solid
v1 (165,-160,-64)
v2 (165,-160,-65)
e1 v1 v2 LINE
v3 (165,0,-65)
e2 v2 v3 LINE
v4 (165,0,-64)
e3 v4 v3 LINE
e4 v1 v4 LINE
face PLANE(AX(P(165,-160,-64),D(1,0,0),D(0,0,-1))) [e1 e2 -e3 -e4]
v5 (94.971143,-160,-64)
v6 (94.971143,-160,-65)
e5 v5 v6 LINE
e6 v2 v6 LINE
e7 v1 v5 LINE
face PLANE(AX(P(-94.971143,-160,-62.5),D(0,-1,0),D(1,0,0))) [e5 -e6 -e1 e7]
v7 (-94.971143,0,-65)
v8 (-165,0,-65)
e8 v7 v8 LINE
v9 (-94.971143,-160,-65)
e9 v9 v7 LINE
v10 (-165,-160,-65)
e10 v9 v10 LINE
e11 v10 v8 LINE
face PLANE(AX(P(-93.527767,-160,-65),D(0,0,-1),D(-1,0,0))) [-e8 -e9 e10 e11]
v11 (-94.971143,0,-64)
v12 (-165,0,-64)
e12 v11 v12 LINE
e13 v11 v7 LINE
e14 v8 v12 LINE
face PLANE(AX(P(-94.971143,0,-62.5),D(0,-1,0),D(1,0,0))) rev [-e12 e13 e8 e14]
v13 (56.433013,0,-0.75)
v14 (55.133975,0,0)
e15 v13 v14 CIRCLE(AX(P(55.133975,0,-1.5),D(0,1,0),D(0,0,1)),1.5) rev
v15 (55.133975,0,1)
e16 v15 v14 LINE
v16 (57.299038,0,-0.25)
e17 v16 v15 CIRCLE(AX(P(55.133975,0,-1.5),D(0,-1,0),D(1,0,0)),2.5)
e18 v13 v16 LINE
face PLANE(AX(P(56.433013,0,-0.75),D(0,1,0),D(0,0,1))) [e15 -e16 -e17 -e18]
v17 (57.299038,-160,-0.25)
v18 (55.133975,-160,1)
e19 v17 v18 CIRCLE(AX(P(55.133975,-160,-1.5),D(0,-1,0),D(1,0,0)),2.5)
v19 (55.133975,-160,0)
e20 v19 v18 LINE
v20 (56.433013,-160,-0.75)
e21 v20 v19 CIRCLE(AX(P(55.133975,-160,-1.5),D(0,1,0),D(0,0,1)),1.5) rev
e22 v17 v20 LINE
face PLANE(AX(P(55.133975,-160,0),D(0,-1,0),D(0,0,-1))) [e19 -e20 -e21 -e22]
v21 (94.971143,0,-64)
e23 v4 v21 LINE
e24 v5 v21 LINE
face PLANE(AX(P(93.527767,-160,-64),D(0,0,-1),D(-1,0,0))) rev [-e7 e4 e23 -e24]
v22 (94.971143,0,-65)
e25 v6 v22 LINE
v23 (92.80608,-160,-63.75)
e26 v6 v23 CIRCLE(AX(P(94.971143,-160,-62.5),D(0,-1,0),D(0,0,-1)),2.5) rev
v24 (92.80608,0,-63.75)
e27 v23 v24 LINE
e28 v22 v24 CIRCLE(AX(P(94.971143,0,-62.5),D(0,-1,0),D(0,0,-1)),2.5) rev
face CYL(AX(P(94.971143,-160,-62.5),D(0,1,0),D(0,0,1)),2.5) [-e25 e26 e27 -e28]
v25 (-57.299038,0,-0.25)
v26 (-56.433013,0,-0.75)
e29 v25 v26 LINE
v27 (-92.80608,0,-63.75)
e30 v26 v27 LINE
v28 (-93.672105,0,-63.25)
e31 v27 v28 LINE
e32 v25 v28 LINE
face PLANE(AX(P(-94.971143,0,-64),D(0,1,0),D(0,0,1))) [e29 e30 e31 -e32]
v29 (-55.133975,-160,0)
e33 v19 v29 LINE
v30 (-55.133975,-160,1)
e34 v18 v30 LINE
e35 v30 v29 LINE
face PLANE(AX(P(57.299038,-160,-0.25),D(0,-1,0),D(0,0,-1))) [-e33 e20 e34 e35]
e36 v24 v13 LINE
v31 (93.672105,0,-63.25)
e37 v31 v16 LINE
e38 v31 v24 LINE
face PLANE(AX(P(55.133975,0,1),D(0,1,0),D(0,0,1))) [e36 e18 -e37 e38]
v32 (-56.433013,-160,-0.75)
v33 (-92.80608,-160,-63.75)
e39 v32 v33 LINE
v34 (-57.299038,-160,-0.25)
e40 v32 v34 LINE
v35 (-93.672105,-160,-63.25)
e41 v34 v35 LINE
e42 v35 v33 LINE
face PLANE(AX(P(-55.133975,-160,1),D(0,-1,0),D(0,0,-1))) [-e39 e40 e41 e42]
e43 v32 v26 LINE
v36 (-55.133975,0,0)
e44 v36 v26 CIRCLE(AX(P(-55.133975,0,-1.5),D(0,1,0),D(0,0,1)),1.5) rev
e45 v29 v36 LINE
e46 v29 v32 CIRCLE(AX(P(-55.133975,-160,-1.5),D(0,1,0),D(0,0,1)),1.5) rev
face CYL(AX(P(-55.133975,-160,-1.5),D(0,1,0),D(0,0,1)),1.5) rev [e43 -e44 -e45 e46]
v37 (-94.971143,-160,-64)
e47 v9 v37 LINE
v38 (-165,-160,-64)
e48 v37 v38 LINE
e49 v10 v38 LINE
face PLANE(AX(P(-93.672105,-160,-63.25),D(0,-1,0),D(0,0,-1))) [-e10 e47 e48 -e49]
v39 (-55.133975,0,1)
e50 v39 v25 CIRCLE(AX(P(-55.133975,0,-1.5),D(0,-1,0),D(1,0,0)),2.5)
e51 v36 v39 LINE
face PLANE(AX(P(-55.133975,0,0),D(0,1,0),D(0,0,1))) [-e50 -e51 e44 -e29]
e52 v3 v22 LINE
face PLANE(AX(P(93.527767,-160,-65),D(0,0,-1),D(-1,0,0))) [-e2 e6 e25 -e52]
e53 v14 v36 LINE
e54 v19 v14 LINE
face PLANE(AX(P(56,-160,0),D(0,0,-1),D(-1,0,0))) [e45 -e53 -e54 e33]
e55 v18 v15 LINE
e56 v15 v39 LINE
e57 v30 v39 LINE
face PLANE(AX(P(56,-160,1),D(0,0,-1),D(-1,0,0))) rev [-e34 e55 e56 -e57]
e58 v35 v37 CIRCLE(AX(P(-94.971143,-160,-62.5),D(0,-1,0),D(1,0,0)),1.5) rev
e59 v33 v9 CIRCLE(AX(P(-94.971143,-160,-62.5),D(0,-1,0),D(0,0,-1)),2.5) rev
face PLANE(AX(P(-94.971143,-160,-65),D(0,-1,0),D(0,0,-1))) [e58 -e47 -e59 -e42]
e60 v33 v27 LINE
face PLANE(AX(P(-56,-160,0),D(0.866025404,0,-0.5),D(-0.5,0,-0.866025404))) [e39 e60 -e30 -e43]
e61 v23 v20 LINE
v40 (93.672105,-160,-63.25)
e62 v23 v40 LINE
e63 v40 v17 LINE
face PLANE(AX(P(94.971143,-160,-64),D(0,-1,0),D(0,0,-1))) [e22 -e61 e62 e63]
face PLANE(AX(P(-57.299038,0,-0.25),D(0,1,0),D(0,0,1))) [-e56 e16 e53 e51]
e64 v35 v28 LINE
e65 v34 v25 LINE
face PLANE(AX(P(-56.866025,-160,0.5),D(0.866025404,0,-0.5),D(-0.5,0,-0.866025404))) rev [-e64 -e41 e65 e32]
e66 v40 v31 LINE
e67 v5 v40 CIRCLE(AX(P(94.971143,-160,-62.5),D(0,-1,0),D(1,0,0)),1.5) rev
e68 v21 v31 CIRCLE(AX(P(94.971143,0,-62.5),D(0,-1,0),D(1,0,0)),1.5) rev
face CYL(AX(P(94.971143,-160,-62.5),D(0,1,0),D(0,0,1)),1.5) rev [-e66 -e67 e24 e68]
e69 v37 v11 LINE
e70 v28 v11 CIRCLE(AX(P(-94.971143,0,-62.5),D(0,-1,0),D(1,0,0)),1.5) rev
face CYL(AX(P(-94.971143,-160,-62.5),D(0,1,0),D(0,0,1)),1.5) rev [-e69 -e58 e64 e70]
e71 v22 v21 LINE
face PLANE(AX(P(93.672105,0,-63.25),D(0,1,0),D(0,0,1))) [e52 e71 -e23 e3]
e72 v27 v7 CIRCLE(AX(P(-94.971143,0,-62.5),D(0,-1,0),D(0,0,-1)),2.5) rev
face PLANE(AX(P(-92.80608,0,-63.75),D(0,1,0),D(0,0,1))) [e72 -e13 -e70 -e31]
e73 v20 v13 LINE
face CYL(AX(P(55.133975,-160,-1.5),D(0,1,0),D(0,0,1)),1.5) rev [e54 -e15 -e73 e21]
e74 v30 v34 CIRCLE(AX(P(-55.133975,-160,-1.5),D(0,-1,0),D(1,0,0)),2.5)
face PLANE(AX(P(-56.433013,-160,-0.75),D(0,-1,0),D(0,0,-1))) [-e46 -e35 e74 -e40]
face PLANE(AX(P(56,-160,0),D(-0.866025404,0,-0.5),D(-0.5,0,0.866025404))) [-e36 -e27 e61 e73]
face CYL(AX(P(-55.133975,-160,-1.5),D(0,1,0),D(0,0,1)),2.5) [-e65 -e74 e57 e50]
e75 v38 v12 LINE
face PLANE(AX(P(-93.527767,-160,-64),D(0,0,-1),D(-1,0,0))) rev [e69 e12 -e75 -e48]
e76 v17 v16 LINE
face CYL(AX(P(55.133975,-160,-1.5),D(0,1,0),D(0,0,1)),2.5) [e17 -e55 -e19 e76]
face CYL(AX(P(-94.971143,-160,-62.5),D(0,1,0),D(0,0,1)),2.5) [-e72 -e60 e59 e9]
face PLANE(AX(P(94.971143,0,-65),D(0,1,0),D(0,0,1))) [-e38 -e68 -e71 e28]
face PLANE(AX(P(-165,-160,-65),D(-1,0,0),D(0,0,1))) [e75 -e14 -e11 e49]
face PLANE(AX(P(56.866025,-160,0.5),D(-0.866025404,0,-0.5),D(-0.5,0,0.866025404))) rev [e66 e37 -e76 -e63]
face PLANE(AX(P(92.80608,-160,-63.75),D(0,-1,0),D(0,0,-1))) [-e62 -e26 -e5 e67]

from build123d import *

# Parameters (mm, degrees)
T_LE_DE_BASE_PLI_E1_DEPTH = 160


# Sheet-metal steps are written as plain solids
with BuildPart() as part:
    # Esquisse1 → Tôle de base pliée1 (new body)
    with BuildSketch(Plane.XZ):
        with BuildLine():
            Line((165, -65), (94.97114317, -65))
            ThreePointArc((94.97114317, -65), (93.72114317, -64.665063509), (92.806079661, -63.75))
            Line((92.806079661, -63.75), (56.433012702, -0.75))
            ThreePointArc((56.433012702, -0.75), (55.883974596, -0.200961894), (55.133974596, 0))
            Line((55.133974596, 0), (-55.133974596, 0))
            ThreePointArc((-55.133974596, 0), (-55.883974596, -0.200961894), (-56.433012702, -0.75))
            Line((-56.433012702, -0.75), (-92.806079661, -63.75))
            ThreePointArc((-92.806079661, -63.75), (-93.72114317, -64.665063509), (-94.97114317, -65))
            Line((-94.97114317, -65), (-165, -65))
            Line((-165, -65), (-165, -64))
            Line((-165, -64), (-94.97114317, -64))
            ThreePointArc((-94.97114317, -64), (-94.22114317, -63.799038106), (-93.672105065, -63.25))
            Line((-93.672105065, -63.25), (-57.299038106, -0.25))
            ThreePointArc((-57.299038106, -0.25), (-56.383974596, 0.665063509), (-55.133974596, 1))
            Line((-55.133974596, 1), (55.133974596, 1))
            ThreePointArc((55.133974596, 1), (56.383974596, 0.665063509), (57.299038106, -0.25))
            Line((57.299038106, -0.25), (93.672105065, -63.25))
            ThreePointArc((93.672105065, -63.25), (94.22114317, -63.799038106), (94.97114317, -64))
            Line((94.97114317, -64), (165, -64))
            Line((165, -64), (165, -65))
        make_face()
    extrude(amount=T_LE_DE_BASE_PLI_E1_DEPTH)


solid = part.part
